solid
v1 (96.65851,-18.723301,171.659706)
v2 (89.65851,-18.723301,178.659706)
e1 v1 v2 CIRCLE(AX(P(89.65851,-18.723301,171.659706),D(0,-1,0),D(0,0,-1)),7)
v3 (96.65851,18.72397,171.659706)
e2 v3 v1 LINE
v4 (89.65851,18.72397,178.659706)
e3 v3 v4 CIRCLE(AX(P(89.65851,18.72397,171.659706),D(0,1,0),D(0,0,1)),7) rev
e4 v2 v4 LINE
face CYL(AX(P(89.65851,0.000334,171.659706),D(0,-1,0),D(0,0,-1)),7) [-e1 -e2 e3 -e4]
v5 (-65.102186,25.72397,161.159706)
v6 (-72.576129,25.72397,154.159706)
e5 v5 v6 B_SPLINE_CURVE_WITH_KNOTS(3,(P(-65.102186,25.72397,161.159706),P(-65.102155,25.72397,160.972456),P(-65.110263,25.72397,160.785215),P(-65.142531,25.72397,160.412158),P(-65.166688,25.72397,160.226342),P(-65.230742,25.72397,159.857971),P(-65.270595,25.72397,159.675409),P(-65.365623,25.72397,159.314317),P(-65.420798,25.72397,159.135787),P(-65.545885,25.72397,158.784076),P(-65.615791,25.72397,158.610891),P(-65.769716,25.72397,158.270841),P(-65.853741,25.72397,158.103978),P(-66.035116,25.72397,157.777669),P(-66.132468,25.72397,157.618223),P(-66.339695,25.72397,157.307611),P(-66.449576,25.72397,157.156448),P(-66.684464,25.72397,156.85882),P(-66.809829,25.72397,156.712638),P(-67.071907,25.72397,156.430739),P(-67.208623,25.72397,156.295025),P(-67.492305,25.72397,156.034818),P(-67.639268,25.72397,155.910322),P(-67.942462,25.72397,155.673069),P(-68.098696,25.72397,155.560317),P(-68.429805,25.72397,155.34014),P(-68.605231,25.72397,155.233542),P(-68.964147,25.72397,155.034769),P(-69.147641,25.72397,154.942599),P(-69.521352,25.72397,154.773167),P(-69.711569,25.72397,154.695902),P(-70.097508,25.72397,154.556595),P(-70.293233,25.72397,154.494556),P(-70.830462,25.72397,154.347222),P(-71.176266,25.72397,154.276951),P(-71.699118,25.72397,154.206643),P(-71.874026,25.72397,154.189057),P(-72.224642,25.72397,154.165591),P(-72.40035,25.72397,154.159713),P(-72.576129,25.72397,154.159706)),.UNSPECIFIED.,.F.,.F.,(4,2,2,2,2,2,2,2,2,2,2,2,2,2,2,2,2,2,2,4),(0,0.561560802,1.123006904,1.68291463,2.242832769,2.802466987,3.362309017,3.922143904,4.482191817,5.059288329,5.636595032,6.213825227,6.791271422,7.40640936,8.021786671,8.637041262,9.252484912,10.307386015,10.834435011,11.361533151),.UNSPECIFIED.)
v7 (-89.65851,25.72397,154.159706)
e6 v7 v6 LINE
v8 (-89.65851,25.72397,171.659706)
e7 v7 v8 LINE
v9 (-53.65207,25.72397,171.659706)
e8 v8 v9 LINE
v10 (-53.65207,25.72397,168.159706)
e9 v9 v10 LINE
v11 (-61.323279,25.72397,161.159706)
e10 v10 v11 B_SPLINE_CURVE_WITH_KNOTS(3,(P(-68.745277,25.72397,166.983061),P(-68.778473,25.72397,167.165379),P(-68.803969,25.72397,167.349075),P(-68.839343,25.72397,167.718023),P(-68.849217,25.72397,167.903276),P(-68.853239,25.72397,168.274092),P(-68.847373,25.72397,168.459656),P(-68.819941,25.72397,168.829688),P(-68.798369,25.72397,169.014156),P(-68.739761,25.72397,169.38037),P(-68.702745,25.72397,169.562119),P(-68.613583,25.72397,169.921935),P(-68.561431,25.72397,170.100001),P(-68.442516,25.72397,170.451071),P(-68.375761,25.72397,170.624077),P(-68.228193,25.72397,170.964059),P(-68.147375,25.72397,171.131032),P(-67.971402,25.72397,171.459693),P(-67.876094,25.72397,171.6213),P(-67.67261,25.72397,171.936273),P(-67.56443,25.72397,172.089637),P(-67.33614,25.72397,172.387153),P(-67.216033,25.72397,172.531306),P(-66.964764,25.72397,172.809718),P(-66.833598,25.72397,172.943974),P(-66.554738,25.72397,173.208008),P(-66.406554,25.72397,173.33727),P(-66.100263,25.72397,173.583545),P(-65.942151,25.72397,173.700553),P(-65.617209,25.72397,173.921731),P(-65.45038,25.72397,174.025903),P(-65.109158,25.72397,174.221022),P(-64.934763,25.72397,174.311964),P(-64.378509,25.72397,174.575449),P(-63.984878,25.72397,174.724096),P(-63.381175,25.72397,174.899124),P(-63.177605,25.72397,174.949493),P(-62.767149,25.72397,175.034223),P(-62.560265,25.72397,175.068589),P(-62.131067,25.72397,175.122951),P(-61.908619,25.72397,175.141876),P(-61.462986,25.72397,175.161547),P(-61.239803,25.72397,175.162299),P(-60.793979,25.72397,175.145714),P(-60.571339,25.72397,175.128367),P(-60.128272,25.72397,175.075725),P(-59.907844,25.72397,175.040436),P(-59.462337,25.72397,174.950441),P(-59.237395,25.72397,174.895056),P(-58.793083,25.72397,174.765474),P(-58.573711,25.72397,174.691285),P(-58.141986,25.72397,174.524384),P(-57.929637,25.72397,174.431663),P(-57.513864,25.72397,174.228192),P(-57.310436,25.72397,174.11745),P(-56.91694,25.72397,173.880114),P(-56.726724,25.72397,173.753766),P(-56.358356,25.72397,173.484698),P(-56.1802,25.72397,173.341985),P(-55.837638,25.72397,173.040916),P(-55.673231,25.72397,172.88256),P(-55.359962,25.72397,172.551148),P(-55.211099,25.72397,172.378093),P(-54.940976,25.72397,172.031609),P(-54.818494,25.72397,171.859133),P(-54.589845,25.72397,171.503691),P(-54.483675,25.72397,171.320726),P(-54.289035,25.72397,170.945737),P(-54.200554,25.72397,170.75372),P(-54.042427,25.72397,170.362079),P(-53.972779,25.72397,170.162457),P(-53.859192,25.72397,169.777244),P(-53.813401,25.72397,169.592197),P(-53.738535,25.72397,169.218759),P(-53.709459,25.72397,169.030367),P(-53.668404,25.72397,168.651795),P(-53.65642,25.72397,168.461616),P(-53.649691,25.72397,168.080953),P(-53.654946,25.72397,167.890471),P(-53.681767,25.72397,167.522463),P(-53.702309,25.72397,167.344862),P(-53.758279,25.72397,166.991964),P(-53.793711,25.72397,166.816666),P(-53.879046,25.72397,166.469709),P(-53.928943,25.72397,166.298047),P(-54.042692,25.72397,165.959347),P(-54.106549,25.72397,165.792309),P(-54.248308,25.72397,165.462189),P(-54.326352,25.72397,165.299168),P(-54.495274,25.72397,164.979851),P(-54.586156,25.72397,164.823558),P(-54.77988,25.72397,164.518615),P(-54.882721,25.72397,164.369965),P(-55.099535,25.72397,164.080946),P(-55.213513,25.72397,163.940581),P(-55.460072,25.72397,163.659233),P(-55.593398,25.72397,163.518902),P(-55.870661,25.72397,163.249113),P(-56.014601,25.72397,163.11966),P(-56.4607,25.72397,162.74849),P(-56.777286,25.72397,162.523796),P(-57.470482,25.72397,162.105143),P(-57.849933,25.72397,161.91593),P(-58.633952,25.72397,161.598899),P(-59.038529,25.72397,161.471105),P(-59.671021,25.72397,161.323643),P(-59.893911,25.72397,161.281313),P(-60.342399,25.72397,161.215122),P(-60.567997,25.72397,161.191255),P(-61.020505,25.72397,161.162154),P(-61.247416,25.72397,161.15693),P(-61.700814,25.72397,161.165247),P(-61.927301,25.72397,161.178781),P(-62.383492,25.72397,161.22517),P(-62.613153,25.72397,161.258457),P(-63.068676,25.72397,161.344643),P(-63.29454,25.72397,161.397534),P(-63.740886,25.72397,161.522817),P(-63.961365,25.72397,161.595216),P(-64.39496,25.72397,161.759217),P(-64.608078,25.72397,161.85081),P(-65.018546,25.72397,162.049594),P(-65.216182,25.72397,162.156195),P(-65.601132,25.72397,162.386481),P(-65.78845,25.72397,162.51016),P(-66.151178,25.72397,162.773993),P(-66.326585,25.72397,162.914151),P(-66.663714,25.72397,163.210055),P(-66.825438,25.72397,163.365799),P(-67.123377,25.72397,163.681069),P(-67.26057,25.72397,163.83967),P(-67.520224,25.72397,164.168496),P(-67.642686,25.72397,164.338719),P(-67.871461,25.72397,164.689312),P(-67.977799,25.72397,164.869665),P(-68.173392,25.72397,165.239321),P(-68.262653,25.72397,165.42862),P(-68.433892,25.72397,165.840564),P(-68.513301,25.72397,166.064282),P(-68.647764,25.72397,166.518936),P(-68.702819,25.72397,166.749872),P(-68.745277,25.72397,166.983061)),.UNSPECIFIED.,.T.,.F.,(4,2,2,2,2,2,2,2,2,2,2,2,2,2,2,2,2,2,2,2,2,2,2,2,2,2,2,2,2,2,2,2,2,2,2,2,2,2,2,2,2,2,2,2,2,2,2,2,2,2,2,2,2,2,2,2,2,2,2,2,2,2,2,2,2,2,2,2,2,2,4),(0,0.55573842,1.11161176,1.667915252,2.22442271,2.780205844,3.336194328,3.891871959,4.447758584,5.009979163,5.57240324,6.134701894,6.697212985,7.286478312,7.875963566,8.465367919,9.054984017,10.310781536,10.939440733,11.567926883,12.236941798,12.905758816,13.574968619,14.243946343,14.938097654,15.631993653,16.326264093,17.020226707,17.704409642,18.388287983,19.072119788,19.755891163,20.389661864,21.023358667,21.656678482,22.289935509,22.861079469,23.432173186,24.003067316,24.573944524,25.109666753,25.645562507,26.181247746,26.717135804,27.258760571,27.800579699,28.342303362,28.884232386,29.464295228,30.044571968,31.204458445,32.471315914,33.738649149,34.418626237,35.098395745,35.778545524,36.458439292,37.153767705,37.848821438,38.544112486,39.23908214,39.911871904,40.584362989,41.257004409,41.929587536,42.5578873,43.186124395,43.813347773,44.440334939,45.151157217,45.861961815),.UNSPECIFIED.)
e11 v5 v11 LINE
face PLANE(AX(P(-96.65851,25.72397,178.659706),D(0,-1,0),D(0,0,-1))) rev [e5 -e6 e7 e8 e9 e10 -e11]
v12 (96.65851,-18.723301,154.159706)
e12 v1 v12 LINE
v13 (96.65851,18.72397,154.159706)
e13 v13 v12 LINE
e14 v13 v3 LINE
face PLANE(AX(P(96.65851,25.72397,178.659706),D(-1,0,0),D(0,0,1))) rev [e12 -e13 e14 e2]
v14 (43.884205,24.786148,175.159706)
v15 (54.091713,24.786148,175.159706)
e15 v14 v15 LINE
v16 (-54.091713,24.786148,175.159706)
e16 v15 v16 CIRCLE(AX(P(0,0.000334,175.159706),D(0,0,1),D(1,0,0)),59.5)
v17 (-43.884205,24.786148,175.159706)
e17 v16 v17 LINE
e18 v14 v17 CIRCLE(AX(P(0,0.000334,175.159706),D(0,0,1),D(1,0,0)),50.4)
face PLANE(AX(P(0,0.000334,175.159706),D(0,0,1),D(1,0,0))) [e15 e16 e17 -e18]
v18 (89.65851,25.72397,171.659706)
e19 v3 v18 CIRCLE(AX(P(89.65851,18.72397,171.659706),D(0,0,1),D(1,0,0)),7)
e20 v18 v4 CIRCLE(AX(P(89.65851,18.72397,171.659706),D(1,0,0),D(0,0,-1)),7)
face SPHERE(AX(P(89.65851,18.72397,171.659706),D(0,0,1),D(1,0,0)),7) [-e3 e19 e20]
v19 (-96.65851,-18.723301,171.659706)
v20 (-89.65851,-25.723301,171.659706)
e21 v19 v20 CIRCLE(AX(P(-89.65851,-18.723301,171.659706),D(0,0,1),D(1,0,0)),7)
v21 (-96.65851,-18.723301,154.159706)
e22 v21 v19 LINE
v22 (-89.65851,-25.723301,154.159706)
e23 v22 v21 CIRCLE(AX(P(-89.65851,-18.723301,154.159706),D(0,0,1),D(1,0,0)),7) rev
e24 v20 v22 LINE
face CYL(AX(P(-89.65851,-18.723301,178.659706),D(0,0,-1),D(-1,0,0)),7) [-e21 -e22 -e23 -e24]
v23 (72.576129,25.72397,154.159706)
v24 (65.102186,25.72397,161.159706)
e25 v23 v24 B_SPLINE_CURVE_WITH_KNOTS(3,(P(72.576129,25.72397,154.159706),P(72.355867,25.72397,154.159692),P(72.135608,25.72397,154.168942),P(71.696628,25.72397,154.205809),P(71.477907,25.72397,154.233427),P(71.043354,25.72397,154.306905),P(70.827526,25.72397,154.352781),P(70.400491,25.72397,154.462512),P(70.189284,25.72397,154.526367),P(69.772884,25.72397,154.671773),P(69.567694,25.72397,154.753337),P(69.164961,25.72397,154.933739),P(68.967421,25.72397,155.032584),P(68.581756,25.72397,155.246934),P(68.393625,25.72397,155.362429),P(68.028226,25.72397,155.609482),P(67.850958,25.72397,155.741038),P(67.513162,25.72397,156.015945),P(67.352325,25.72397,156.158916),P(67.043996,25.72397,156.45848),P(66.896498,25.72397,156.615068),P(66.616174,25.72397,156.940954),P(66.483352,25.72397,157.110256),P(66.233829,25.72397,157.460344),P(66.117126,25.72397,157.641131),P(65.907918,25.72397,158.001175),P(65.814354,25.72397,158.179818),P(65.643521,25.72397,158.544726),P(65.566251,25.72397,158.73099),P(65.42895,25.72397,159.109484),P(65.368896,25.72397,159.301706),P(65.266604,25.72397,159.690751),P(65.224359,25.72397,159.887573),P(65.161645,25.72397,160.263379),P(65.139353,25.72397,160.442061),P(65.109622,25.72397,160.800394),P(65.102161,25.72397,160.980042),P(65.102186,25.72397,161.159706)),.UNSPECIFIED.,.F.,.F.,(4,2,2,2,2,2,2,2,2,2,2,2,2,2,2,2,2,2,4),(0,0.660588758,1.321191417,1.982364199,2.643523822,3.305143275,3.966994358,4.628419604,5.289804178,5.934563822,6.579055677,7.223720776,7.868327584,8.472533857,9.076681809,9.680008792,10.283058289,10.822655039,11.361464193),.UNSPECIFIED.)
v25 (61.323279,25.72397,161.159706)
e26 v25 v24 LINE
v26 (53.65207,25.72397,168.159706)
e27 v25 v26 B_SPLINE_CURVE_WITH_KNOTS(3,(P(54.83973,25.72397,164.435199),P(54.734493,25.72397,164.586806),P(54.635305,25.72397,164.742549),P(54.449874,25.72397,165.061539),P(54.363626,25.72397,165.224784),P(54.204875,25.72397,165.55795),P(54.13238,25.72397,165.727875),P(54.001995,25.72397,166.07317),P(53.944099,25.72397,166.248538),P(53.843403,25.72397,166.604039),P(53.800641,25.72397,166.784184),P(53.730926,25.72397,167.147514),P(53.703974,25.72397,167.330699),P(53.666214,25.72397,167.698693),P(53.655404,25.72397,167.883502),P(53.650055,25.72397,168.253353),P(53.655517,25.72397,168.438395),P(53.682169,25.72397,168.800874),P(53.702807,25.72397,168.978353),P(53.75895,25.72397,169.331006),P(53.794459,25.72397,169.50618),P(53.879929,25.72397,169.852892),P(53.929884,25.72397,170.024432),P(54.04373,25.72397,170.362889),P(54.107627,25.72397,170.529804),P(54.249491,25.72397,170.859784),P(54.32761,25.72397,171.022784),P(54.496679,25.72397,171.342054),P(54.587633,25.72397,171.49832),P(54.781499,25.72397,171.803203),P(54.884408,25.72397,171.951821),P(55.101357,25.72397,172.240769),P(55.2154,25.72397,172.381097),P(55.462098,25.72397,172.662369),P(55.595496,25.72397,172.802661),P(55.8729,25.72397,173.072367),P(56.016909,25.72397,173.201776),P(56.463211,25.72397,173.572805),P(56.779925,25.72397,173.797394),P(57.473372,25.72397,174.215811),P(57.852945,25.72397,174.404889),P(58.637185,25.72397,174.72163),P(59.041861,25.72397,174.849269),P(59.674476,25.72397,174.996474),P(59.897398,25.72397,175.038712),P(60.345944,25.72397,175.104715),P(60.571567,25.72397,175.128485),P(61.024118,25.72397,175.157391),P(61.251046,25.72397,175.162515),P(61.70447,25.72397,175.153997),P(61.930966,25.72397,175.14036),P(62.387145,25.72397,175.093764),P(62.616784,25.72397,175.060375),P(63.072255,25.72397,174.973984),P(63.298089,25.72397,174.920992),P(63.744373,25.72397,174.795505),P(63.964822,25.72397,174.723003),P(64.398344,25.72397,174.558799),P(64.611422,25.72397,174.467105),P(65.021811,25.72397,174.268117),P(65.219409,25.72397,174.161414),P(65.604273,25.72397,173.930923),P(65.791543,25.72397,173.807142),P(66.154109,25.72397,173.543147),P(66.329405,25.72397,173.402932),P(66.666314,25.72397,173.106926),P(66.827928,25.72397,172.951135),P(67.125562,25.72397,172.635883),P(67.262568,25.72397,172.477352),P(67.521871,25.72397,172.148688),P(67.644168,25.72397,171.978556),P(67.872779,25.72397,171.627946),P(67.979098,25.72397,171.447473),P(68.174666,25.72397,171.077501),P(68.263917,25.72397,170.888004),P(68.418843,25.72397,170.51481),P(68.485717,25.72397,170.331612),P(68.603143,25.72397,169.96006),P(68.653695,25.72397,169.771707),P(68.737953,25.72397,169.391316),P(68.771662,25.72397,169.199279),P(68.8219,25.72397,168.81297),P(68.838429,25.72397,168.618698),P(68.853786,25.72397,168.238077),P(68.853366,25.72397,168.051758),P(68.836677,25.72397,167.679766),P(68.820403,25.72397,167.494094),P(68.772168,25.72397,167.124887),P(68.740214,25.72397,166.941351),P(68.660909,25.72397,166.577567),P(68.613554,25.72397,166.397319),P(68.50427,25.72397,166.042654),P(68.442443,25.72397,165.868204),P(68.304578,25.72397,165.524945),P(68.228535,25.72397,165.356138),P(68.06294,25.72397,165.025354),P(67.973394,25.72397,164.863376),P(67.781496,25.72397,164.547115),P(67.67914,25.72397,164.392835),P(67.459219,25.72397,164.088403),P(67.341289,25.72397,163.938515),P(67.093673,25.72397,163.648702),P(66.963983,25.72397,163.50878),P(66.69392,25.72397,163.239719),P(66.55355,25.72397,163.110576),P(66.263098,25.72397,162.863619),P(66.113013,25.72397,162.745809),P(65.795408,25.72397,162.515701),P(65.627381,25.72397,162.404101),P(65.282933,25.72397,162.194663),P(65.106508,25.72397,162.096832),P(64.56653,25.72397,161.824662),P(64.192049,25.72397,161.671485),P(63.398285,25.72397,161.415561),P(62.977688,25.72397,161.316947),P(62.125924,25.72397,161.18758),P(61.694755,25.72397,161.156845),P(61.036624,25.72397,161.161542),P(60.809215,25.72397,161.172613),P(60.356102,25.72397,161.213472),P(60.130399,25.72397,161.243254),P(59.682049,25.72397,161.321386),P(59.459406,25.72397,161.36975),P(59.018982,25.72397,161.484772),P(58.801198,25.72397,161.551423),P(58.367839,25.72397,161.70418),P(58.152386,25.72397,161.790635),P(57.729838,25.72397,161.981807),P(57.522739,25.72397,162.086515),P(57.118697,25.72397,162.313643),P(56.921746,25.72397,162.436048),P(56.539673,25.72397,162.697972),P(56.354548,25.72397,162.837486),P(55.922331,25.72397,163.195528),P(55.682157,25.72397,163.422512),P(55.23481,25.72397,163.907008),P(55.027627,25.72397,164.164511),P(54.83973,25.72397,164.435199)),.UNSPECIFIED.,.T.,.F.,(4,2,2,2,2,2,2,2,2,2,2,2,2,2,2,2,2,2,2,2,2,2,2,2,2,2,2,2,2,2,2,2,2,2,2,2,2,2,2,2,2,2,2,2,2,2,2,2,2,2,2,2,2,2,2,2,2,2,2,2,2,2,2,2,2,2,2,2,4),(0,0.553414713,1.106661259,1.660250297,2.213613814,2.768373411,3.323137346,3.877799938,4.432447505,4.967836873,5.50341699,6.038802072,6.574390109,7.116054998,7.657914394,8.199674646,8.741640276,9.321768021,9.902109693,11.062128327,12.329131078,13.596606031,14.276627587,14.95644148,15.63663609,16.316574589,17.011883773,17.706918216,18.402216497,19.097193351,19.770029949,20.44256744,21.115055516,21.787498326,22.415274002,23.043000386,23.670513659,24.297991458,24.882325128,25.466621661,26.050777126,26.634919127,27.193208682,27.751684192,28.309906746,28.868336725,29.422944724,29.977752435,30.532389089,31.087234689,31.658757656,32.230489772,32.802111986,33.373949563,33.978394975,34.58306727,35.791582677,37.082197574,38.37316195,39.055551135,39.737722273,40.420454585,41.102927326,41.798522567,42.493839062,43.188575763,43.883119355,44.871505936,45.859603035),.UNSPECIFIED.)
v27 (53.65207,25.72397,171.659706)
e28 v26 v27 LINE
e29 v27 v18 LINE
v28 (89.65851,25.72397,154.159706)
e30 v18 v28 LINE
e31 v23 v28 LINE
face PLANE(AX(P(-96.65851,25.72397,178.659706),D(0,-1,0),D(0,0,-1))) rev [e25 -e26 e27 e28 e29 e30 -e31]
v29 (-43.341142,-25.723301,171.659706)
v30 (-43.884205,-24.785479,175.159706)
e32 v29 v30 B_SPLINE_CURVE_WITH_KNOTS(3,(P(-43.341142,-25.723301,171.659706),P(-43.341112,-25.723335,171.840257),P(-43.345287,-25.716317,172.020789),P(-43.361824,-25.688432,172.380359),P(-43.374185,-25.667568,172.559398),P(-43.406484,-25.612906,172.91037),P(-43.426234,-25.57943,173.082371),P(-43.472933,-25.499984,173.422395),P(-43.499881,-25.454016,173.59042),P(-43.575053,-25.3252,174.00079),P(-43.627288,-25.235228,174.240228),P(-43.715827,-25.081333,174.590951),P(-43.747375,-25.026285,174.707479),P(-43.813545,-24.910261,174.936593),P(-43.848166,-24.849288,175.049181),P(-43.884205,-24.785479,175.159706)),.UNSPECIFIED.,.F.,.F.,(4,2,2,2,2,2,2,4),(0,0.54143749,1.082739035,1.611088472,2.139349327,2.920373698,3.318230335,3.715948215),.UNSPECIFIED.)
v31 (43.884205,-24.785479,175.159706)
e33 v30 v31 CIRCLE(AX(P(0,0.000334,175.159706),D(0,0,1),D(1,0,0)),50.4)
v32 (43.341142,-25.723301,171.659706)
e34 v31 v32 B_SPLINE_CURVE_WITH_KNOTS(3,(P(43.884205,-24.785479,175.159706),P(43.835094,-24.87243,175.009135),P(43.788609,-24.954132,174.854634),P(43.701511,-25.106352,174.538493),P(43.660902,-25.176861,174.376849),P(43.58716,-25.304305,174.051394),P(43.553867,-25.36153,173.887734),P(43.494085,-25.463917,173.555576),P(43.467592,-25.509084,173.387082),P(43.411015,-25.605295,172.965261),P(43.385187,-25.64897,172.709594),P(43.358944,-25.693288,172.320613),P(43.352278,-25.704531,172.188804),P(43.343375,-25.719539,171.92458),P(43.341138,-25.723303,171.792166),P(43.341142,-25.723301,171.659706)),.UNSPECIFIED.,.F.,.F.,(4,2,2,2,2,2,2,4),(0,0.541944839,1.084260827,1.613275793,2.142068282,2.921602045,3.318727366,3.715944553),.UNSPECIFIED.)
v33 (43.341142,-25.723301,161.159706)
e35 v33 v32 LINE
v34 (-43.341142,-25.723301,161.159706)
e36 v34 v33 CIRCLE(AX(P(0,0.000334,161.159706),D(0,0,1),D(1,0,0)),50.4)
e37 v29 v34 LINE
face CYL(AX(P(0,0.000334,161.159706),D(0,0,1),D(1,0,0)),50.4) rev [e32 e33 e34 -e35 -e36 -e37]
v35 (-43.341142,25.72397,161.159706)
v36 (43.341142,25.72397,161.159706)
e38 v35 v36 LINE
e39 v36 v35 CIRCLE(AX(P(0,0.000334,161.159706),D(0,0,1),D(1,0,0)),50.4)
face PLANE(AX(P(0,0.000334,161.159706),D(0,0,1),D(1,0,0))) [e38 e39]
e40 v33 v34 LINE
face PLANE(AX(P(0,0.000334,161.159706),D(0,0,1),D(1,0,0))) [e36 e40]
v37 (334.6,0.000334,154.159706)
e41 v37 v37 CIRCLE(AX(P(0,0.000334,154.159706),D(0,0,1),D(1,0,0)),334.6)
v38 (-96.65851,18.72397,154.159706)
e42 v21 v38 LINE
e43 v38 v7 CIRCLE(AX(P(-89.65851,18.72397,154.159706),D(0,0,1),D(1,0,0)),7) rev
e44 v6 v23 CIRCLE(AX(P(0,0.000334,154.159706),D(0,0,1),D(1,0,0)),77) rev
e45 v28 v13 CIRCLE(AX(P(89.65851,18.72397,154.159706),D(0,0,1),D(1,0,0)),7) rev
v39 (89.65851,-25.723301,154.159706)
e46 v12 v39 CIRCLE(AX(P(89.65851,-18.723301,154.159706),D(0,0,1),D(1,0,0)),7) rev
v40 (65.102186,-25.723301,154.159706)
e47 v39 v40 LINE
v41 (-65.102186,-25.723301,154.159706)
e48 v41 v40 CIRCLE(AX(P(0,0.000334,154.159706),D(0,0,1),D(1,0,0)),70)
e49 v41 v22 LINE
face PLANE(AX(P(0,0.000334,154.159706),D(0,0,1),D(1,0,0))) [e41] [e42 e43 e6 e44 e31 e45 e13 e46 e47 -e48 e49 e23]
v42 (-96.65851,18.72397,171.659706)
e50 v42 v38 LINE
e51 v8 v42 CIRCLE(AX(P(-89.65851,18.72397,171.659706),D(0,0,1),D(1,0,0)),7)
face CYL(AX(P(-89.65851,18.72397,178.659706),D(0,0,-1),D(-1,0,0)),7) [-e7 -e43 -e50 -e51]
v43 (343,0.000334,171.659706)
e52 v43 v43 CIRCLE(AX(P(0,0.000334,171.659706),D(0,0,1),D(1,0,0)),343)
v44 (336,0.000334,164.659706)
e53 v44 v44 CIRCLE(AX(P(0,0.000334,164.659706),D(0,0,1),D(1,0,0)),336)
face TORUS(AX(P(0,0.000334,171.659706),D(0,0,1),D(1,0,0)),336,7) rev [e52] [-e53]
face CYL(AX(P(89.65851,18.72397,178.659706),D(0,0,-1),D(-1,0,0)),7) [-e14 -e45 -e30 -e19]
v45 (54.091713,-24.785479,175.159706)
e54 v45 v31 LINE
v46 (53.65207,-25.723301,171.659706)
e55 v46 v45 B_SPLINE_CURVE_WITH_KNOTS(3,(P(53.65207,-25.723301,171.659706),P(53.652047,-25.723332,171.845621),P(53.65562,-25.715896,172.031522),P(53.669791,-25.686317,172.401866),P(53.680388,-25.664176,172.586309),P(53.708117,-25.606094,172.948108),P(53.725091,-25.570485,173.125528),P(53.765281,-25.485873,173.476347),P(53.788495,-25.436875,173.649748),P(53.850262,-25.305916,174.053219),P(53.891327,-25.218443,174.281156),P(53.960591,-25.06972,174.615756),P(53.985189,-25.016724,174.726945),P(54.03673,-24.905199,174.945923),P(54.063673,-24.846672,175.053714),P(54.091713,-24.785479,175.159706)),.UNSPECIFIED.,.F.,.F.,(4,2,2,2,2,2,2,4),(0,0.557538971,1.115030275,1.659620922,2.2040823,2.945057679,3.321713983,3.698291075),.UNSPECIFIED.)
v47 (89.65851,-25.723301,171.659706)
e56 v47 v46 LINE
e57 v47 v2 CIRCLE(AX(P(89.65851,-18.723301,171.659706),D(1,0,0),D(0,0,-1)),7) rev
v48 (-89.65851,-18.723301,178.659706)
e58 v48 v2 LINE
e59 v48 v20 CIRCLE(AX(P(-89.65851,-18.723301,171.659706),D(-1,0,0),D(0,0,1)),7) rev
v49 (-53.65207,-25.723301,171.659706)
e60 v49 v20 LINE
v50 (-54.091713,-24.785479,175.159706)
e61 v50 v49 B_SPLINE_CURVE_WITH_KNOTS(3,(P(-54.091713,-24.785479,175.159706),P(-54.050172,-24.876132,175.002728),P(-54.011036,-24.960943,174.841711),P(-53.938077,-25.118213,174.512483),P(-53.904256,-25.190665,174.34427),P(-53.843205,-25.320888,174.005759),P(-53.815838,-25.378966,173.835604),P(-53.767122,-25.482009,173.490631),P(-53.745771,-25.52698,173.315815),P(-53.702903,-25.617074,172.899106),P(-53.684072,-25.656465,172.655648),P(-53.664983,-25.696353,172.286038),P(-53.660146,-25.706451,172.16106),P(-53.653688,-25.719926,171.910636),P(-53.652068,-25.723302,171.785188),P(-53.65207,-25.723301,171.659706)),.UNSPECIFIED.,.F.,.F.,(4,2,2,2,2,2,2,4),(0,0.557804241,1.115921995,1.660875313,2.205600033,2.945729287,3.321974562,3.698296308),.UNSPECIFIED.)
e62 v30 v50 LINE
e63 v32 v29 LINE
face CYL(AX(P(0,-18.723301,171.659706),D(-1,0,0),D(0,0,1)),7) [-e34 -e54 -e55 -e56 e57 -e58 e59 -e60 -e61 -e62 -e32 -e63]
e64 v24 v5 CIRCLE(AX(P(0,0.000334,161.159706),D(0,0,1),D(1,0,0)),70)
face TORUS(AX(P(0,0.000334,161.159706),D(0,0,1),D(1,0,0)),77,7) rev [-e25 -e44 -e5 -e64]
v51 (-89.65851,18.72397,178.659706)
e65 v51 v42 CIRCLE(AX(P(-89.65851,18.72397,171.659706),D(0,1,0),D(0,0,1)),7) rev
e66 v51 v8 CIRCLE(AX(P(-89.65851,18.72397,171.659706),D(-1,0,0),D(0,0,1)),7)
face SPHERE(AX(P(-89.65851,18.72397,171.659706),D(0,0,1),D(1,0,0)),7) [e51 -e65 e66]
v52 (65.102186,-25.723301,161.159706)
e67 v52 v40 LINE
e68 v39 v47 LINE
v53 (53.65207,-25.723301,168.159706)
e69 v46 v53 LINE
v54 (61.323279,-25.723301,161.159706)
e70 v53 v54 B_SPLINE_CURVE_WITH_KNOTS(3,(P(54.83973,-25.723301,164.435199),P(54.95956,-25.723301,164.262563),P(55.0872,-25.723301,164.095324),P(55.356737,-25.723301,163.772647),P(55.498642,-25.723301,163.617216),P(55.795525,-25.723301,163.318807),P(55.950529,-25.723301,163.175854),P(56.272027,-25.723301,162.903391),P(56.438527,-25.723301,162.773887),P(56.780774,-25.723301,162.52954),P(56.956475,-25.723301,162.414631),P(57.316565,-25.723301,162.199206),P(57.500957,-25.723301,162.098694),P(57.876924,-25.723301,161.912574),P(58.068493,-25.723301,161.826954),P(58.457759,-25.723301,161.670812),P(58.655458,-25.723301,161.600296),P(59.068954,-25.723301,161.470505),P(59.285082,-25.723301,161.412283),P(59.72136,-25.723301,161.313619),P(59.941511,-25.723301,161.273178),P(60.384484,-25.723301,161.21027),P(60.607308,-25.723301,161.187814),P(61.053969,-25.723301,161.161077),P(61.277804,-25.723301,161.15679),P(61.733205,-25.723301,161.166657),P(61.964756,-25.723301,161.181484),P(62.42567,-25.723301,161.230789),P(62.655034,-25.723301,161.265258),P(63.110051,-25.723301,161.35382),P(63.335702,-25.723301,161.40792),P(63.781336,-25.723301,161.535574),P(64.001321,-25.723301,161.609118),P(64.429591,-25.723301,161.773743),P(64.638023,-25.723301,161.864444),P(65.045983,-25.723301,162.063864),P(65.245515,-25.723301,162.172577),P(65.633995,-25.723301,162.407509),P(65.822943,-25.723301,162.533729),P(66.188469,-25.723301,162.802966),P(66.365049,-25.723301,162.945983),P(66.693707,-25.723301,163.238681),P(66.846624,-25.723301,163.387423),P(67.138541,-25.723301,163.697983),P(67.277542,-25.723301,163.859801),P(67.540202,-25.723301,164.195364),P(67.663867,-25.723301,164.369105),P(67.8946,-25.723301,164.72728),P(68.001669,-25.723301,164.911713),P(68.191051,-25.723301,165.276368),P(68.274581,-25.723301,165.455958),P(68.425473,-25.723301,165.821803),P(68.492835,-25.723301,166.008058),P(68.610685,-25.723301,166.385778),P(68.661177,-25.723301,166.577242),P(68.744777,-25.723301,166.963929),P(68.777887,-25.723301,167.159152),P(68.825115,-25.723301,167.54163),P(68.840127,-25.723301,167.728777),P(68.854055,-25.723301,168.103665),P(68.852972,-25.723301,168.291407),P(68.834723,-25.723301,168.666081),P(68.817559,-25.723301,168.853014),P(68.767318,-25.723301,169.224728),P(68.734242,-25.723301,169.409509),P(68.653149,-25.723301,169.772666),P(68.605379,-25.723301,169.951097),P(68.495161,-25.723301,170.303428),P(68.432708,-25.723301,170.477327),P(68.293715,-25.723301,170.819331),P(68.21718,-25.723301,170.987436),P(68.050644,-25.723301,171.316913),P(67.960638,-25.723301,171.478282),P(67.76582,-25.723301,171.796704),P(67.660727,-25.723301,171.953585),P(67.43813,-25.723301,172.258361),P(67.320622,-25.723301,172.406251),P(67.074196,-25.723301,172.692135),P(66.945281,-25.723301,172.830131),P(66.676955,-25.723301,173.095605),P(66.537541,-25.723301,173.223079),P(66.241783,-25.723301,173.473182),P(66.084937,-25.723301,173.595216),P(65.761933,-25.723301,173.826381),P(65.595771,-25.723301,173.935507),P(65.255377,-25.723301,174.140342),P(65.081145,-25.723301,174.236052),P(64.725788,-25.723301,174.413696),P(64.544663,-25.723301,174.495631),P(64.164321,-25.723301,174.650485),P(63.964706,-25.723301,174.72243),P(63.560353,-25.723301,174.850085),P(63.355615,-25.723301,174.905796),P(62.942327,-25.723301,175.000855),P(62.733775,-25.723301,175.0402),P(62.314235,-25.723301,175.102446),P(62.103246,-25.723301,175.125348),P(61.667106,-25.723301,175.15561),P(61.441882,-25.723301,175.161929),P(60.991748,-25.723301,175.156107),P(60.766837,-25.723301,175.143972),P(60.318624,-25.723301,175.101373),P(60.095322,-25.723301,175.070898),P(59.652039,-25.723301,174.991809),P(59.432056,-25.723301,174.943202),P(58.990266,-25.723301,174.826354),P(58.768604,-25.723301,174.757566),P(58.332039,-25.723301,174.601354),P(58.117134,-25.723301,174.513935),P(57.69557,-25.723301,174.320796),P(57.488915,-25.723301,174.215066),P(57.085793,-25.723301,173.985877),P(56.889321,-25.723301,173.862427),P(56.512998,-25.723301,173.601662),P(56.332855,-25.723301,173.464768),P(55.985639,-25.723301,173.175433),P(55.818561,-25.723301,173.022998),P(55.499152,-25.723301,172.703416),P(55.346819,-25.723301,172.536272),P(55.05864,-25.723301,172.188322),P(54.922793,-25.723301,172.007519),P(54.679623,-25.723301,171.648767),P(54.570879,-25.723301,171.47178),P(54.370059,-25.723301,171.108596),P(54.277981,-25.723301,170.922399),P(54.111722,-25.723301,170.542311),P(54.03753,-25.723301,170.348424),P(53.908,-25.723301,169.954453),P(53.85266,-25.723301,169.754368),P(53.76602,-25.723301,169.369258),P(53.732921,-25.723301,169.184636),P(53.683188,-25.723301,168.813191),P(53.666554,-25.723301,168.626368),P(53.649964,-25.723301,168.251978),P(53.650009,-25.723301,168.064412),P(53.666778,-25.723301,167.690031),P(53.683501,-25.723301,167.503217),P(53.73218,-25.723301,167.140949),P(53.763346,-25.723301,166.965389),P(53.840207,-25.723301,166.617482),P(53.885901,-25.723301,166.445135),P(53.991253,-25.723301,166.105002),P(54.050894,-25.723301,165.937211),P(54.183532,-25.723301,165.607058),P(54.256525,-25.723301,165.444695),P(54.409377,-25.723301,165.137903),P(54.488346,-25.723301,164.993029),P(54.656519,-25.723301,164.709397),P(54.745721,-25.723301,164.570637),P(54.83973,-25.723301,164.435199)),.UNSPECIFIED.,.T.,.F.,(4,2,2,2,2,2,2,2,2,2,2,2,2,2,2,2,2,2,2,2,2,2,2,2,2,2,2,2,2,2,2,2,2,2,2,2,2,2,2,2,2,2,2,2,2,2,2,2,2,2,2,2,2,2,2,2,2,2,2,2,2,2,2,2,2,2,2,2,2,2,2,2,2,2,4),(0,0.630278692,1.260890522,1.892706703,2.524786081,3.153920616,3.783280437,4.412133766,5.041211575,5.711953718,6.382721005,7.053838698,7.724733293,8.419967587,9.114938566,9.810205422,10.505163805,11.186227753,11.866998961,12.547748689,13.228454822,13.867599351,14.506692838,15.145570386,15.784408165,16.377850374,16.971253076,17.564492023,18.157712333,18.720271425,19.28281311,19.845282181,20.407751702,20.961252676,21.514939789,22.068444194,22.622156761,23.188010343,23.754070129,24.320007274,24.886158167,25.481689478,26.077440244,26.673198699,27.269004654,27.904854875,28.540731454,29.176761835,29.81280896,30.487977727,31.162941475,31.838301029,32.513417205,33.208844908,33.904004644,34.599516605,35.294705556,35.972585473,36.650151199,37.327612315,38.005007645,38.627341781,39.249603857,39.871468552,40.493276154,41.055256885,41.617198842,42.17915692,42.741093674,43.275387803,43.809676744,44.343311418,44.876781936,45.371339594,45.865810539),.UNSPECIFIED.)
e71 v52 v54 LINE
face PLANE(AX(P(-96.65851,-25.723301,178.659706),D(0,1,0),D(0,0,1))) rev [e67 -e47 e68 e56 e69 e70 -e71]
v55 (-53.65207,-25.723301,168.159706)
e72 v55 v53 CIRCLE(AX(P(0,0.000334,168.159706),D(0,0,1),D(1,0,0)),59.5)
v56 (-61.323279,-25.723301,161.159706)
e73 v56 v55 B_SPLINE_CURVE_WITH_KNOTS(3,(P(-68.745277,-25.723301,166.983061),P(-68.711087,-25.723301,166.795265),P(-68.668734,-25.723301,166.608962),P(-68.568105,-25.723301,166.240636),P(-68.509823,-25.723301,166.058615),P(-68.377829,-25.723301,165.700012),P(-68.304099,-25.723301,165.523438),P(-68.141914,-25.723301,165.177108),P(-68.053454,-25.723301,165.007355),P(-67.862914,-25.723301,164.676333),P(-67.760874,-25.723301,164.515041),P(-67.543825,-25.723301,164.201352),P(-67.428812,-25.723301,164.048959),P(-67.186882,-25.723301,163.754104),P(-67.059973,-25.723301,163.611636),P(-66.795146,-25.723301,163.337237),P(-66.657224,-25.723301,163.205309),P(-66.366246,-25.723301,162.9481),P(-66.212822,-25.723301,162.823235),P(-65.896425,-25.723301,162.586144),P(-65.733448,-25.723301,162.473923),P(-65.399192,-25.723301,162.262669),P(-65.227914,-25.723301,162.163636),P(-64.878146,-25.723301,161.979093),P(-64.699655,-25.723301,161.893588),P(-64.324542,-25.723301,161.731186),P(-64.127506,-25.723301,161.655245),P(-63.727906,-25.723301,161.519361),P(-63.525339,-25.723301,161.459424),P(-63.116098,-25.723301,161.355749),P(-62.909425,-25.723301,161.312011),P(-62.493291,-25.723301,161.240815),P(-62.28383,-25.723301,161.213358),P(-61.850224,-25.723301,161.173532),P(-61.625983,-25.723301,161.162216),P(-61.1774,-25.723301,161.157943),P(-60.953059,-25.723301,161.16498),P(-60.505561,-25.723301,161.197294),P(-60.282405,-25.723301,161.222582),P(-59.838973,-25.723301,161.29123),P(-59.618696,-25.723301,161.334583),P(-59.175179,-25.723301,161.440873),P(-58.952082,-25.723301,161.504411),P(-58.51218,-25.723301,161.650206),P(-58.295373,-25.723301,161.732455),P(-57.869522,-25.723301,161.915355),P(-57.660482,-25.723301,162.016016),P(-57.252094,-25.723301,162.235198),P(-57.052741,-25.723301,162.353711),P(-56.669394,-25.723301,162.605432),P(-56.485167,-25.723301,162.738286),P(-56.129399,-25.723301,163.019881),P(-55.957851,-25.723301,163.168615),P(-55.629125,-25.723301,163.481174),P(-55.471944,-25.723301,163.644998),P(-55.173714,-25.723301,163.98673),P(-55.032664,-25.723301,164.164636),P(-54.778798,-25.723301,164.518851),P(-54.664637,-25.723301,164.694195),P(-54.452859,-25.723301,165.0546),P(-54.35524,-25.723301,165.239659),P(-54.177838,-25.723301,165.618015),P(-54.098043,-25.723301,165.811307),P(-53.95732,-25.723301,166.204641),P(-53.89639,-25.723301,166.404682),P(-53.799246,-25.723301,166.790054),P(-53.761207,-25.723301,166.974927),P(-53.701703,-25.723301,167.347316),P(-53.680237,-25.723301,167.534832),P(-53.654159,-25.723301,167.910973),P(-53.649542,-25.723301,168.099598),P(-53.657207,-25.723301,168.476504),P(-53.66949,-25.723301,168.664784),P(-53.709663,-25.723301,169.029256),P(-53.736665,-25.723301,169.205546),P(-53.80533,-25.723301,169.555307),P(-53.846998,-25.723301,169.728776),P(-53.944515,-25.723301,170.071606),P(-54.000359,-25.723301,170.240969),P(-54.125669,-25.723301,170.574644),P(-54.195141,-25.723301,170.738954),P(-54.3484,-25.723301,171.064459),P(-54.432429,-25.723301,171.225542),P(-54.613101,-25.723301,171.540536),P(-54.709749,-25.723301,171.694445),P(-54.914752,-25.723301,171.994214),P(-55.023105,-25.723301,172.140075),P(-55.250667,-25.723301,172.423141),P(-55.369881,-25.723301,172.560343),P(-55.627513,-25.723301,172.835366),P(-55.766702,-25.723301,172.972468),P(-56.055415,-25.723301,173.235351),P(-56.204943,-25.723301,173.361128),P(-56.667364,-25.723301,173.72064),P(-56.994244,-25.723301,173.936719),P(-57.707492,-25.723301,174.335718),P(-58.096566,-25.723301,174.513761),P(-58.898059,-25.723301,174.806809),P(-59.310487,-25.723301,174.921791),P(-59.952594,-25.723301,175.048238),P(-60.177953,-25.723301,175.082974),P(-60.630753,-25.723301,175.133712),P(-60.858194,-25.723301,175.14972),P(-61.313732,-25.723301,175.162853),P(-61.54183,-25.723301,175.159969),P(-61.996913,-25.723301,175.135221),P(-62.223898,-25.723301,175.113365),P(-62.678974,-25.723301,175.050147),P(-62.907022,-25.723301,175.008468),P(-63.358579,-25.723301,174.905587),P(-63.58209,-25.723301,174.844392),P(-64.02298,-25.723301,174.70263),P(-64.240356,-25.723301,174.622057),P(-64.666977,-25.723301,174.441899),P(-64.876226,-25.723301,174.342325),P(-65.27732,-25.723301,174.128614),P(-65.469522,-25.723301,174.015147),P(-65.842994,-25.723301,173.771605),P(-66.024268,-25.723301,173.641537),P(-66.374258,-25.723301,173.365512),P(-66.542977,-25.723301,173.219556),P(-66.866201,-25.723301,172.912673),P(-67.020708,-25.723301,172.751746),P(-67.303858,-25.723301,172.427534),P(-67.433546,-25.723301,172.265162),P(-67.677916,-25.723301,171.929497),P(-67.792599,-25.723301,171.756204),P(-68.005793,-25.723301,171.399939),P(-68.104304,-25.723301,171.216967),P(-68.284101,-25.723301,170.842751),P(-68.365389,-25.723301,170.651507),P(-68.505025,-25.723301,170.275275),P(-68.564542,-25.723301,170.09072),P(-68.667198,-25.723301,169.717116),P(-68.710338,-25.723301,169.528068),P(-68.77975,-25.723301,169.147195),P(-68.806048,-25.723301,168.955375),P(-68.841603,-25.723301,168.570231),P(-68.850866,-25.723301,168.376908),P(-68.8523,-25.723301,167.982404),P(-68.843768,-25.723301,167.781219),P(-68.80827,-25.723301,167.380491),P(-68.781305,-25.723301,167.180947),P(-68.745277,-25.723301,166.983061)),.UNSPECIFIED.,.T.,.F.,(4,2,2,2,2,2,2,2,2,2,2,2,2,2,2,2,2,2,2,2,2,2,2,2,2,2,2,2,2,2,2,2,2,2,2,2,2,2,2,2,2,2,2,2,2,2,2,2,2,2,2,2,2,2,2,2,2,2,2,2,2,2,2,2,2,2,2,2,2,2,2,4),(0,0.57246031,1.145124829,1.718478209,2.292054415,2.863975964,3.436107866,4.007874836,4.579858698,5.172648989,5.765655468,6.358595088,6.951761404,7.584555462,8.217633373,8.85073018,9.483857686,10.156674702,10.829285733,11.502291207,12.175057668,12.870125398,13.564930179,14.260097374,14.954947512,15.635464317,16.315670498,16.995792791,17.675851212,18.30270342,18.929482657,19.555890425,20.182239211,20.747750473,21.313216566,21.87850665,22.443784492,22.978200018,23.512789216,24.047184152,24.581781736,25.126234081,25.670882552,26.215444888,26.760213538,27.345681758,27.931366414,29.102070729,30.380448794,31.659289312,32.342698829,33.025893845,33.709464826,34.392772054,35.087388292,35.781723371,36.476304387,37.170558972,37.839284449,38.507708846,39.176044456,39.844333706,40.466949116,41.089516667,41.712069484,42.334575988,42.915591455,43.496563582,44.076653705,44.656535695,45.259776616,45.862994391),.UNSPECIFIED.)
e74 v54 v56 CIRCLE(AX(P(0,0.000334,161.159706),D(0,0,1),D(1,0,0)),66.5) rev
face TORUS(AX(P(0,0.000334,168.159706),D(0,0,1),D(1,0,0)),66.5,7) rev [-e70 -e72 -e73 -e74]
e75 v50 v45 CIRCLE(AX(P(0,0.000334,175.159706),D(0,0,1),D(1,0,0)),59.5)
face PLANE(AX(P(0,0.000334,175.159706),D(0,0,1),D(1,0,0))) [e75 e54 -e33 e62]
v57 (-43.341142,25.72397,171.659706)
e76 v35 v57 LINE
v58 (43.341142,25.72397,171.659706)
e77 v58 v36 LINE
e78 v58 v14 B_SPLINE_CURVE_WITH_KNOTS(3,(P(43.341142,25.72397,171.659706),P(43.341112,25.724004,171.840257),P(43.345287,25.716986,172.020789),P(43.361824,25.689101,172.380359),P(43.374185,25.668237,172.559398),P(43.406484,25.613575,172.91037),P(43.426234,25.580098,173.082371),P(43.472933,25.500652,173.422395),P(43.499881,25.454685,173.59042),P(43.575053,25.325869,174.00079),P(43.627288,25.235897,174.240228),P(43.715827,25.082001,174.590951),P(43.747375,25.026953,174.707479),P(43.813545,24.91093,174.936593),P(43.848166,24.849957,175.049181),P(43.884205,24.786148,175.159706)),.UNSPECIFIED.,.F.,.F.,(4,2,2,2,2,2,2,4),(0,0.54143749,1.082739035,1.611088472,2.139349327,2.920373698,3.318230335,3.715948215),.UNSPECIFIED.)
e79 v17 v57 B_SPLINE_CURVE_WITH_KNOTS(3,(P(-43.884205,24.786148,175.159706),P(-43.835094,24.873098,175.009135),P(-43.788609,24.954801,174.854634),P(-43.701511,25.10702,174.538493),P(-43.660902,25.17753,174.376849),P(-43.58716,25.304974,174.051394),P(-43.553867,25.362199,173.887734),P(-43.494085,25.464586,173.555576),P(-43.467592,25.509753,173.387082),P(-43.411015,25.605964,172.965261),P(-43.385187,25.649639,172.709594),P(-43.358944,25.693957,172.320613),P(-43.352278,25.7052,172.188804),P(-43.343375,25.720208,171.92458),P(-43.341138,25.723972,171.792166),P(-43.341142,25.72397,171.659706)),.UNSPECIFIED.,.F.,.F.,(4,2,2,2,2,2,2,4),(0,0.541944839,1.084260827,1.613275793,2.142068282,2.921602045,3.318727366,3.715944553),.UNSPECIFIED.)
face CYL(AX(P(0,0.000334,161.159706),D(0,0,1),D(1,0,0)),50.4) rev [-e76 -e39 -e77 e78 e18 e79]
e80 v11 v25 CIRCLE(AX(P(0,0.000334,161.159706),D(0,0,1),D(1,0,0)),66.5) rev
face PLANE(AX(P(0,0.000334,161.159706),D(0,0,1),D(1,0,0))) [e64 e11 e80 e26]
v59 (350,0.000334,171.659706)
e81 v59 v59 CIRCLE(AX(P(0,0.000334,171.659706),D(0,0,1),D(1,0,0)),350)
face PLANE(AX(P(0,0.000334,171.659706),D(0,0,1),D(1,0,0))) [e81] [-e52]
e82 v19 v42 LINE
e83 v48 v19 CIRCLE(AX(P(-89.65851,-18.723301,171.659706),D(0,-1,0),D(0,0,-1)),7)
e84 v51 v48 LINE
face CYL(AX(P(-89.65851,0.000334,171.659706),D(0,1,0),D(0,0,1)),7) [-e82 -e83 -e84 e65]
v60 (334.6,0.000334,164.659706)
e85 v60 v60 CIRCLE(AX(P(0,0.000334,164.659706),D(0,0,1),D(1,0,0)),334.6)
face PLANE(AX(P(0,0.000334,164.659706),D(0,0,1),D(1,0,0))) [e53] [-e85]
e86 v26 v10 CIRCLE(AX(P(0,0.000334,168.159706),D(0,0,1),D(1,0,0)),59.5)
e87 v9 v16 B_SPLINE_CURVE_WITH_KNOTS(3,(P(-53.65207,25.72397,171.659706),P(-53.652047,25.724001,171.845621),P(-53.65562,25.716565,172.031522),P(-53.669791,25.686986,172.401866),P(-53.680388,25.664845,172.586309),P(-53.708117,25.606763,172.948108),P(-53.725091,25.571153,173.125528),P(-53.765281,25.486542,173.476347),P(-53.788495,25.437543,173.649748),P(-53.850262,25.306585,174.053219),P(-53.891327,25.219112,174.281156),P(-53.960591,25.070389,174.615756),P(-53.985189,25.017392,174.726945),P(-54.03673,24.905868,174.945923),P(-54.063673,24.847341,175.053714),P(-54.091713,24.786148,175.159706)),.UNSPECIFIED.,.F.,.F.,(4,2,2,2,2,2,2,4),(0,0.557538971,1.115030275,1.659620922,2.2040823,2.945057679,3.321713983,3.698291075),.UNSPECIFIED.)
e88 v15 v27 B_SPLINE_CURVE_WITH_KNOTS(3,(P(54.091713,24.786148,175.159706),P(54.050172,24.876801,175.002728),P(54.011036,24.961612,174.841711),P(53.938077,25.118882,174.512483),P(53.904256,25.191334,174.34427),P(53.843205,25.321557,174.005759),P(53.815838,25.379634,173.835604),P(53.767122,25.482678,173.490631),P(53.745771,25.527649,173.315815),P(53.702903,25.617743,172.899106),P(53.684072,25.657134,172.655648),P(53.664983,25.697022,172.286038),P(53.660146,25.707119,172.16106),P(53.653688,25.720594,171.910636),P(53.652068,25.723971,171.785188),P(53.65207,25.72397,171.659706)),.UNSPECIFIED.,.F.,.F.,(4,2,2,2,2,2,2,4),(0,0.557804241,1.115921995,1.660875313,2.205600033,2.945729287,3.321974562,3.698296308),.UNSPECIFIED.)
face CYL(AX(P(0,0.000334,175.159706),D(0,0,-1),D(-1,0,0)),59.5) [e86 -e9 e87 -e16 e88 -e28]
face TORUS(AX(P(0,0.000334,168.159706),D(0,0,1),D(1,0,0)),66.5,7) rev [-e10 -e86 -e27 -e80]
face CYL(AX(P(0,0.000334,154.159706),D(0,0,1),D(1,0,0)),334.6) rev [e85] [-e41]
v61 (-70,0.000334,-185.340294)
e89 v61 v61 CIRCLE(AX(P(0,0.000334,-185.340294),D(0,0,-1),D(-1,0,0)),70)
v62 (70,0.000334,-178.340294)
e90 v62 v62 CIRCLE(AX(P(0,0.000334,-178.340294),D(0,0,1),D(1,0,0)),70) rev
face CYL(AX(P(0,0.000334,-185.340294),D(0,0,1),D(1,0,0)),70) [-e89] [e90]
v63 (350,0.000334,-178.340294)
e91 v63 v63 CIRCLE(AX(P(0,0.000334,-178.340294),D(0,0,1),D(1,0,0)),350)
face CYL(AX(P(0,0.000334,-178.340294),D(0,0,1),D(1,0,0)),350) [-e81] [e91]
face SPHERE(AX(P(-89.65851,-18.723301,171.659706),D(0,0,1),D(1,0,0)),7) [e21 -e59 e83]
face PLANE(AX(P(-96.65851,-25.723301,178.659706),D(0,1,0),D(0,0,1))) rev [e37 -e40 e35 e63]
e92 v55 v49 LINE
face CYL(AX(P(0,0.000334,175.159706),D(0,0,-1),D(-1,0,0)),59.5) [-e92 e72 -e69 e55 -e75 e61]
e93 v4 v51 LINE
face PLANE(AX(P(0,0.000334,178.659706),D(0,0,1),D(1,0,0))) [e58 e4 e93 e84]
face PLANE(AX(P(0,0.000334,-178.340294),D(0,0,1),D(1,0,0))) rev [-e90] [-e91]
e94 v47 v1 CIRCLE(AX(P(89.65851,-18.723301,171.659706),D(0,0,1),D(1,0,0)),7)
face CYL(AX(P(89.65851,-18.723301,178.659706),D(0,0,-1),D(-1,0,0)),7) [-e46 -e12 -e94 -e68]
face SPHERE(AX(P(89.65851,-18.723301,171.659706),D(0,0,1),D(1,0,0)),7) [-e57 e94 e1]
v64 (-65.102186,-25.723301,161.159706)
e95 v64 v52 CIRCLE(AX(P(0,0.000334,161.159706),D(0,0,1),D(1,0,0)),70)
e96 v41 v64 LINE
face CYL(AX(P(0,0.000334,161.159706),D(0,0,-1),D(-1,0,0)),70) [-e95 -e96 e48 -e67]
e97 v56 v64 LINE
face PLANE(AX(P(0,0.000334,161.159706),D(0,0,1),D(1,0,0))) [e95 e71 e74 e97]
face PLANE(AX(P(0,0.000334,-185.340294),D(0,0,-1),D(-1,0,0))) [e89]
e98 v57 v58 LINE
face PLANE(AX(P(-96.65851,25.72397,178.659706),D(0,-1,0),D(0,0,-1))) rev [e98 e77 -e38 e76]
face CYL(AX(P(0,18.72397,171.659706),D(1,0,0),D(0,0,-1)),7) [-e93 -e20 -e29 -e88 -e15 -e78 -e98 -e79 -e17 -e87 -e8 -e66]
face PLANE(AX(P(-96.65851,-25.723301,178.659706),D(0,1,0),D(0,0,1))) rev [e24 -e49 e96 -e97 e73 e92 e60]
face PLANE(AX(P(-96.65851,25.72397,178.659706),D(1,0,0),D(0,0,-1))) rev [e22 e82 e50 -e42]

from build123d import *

# Parameters (mm, degrees)
BOSS_EXTRUDE1_DEPTH      = 250
BOSS_EXTRUDE1_DEPTH_BACK = 250
SKETCH2_R                = 500
SKETCH3_R                = 490
CUT_EXTRUDE4_DEPTH       = 10
SKETCH5_R                = 478
CUT_EXTRUDE5_DEPTH       = 15
SKETCH6_R                = 100
BOSS_EXTRUDE2_DEPTH      = 10
SKETCH7_R                = 85
BOSS_EXTRUDE3_DEPTH      = 20
SKETCH8_R                = 72
CUT_EXTRUDE6_DEPTH       = 20
FILLET2_R                = 10
SKETCH9_W                = 276.167171278
SKETCH9_H                = 73.496102034
BOSS_EXTRUDE4_DEPTH      = 40
FILLET3_R                = 10
FILLET4_R                = 10
FILLET5_R                = 10
BOSS_EXTRUDE5_START      = 10
SKETCH10_R               = 100
BOSS_EXTRUDE5_DEPTH      = 10
SCALE1_SCALE             = 0.7


# Some blends are built 0.0001 mm under size
with BuildPart() as part:
    # Sketch2 → Boss-Extrude1 (new, two sides: drawn at the far end of the back side and taken through both)
    with BuildSketch(Plane.XY.offset(-BOSS_EXTRUDE1_DEPTH_BACK)):
        Circle(SKETCH2_R)
    extrude(amount=BOSS_EXTRUDE1_DEPTH + BOSS_EXTRUDE1_DEPTH_BACK)

    # Sketch3 → Cut-Extrude4 (cut)
    with BuildSketch(Plane.XY.offset(250)):
        Circle(SKETCH3_R)
    extrude(amount=-CUT_EXTRUDE4_DEPTH, mode=Mode.SUBTRACT)

    # Sketch5 → Cut-Extrude5 (cut)
    with BuildSketch(Plane.XY.offset(240)):
        Circle(SKETCH5_R)
    extrude(amount=-CUT_EXTRUDE5_DEPTH, mode=Mode.SUBTRACT)

    # Sketch6 → Boss-Extrude2 (add)
    with BuildSketch(Plane.XY.offset(225)):
        Circle(SKETCH6_R)
    extrude(amount=BOSS_EXTRUDE2_DEPTH)

    # Sketch7 → Boss-Extrude3 (add)
    with BuildSketch(Plane.XY.offset(235)):
        Circle(SKETCH7_R)
    extrude(amount=BOSS_EXTRUDE3_DEPTH)

    # Sketch8 → Cut-Extrude6 (cut)
    with BuildSketch(Plane.XY.offset(255)):
        Circle(SKETCH8_R)
    extrude(amount=-CUT_EXTRUDE6_DEPTH, mode=Mode.SUBTRACT)

    # Fillet2
    fillet2_edges = [part.edges().sort_by_distance(p)[0] for p in [
        (-85, 0, 235),
    ]]
    fillet(fillet2_edges, radius=FILLET2_R)

    # Sketch9 → Boss-Extrude4 (add)
    with BuildSketch(Plane.XY.offset(220)):
        Rectangle(SKETCH9_W, SKETCH9_H)
    extrude(amount=BOSS_EXTRUDE4_DEPTH)

    # Fillet3
    # the kernel refuses this fillet: 10 mm, written as the material it takes off along each edge
    with BuildSketch(Plane(origin=(128.083585639, -26.748051017, 250), x_dir=(0, 0, 1), z_dir=(1, 0, 0))) as fillet3_piece_1_section:
        Polygon((0, 0), (FILLET3_R * 1.02, 0), (FILLET3_R * 1.02, FILLET3_R * 1.02), (0, FILLET3_R * 1.02), align=None)
    fillet3_piece_1 = extrude(amount=FILLET3_R * 1.02, mode=Mode.PRIVATE)
    fillet3_piece_1 = fillet3_piece_1 - Plane(origin=(128.083585639, -26.748051017, 250), x_dir=(0, 0.7071067811865475, -0.7071067811865475), z_dir=(1, 0, 0)) * Sphere(FILLET3_R, mode=Mode.PRIVATE)
    add(fillet3_piece_1, mode=Mode.SUBTRACT)
    with BuildSketch(Plane(origin=(-128.083585639, -26.748051017, 250), x_dir=(-1, 0, 0), z_dir=(0, 0, 1))) as fillet3_piece_2_section:
        Polygon((0, 0), (FILLET3_R * 1.02, 0), (FILLET3_R * 1.02, FILLET3_R * 1.02), (0, FILLET3_R * 1.02), align=None)
    fillet3_piece_2 = extrude(amount=FILLET3_R * 1.02, mode=Mode.PRIVATE)
    fillet3_piece_2 = fillet3_piece_2 - Plane(origin=(-128.083585639, -26.748051017, 250), x_dir=(0.7071067811865475, 0.7071067811865475, 0), z_dir=(0, 0, 1)) * Sphere(FILLET3_R, mode=Mode.PRIVATE)
    add(fillet3_piece_2, mode=Mode.SUBTRACT)
    with BuildSketch(Plane(origin=(-128.083585639, 26.748051017, 250), x_dir=(0, 0, 1), z_dir=(0, 1, 0))) as fillet3_piece_3_section:
        Polygon((0, 0), (FILLET3_R * 1.02, 0), (FILLET3_R * 1.02, -FILLET3_R * 1.02), (0, -FILLET3_R * 1.02), align=None)
    fillet3_piece_3 = extrude(amount=FILLET3_R * 1.02, mode=Mode.PRIVATE)
    fillet3_piece_3 = fillet3_piece_3 - Plane(origin=(-128.083585639, 26.748051017, 250), x_dir=(0.7071067811865475, 0, -0.7071067811865475), z_dir=(0, 1, 0)) * Sphere(FILLET3_R, mode=Mode.PRIVATE)
    add(fillet3_piece_3, mode=Mode.SUBTRACT)
    with BuildSketch(Plane(origin=(128.083585639, 26.748051017, 250), x_dir=(0, 1, 0), z_dir=(1, 0, 0))) as fillet3_piece_4_section:
        Polygon((0, 0), (FILLET3_R * 1.02, 0), (FILLET3_R * 1.02, FILLET3_R * 1.02), (0, FILLET3_R * 1.02), align=None)
    fillet3_piece_4 = extrude(amount=FILLET3_R * 1.02, mode=Mode.PRIVATE)
    fillet3_piece_4 = fillet3_piece_4 - Plane(origin=(128.083585639, 26.748051017, 250), x_dir=(0, -0.7071067811865475, -0.7071067811865475), z_dir=(1, 0, 0)) * Sphere(FILLET3_R, mode=Mode.PRIVATE)
    add(fillet3_piece_4, mode=Mode.SUBTRACT)
    with BuildSketch(Plane(origin=(128.083585639, -36.748051017, 260), x_dir=(0, 1, 0), z_dir=(-1, 0, 0))) as fillet3_piece_5_section:
        with BuildLine():
            CenterArc((FILLET3_R, FILLET3_R), FILLET3_R, 180, 90)
            Line((0, FILLET3_R), (0, 0))
            Line((0, 0), (FILLET3_R, 0))
        make_face()
    fillet3_piece_5 = extrude(amount=256.167171277, mode=Mode.PRIVATE)
    fillet3_piece_5 = split(fillet3_piece_5, bisect_by=Plane(origin=(102.906545957, -34.337396915, 255), z_dir=(0, 0, 1)), keep=Keep.TOP, mode=Mode.PRIVATE)
    add(fillet3_piece_5, mode=Mode.SUBTRACT)
    with BuildSketch(Plane(origin=(128.083585639, -36.748051017, 260), x_dir=(0, 1, 0), z_dir=(-1, 0, 0))) as fillet3_piece_6_section:
        with BuildLine():
            CenterArc((FILLET3_R, FILLET3_R), FILLET3_R, 180, 90)
            Line((0, FILLET3_R), (0, 0))
            Line((0, 0), (FILLET3_R, 0))
        make_face()
    fillet3_piece_6 = extrude(amount=256.167171277, mode=Mode.PRIVATE)
    fillet3_piece_6 = fillet3_piece_6 - Plane(origin=(0, 0, 253.76582848), x_dir=(1, 0, 0), z_dir=(0, 0, -1)) * Cylinder(85, 553, mode=Mode.PRIVATE)
    add(fillet3_piece_6, mode=Mode.SUBTRACT)
    with BuildSketch(Plane(origin=(128.083585639, -36.748051017, 260), x_dir=(0, 1, 0), z_dir=(-1, 0, 0))) as fillet3_piece_7_section:
        with BuildLine():
            CenterArc((FILLET3_R, FILLET3_R), FILLET3_R, 180, 90)
            Line((0, FILLET3_R), (0, 0))
            Line((0, 0), (FILLET3_R, 0))
        make_face()
    fillet3_piece_7 = extrude(amount=256.167171277, mode=Mode.PRIVATE)
    fillet3_piece_7 = fillet3_piece_7 & Plane(origin=(0, 0, 253.76892881), x_dir=(1, 0, 0), z_dir=(0, 0, 1)) * Cylinder(72, 553, mode=Mode.PRIVATE)
    add(fillet3_piece_7, mode=Mode.SUBTRACT)
    with BuildSketch(Plane(origin=(-138.083585639, -26.748051017, 260), x_dir=(1, 0, 0), z_dir=(0, 1, 0))) as fillet3_piece_8:
        with BuildLine():
            CenterArc((FILLET3_R, FILLET3_R), FILLET3_R, 180, 90)
            Line((0, FILLET3_R), (0, 0))
            Line((0, 0), (FILLET3_R, 0))
        make_face()
    extrude(amount=53.496102033, mode=Mode.SUBTRACT)
    with BuildSketch(Plane(origin=(-128.083585639, 36.748051017, 260), x_dir=(0, 0, -1), z_dir=(1, 0, 0))) as fillet3_piece_9_section:
        with BuildLine():
            CenterArc((FILLET3_R, -FILLET3_R), FILLET3_R, 90, 90)
            Line((0, -FILLET3_R), (0, 0))
            Line((0, 0), (FILLET3_R, 0))
        make_face()
    fillet3_piece_9 = extrude(amount=256.167171277, mode=Mode.PRIVATE)
    fillet3_piece_9 = fillet3_piece_9 - Plane(origin=(0, 0, 253.76582848), x_dir=(1, 0, 0), z_dir=(0, 0, -1)) * Cylinder(85, 553, mode=Mode.PRIVATE)
    add(fillet3_piece_9, mode=Mode.SUBTRACT)
    with BuildSketch(Plane(origin=(-128.083585639, 36.748051017, 260), x_dir=(0, 0, -1), z_dir=(1, 0, 0))) as fillet3_piece_10_section:
        with BuildLine():
            CenterArc((FILLET3_R, -FILLET3_R), FILLET3_R, 90, 90)
            Line((0, -FILLET3_R), (0, 0))
            Line((0, 0), (FILLET3_R, 0))
        make_face()
    fillet3_piece_10 = extrude(amount=256.167171277, mode=Mode.PRIVATE)
    fillet3_piece_10 = split(fillet3_piece_10, bisect_by=Plane(origin=(-70.492794496, 34.331084629, 255), z_dir=(0, 0, 1)), keep=Keep.TOP, mode=Mode.PRIVATE)
    add(fillet3_piece_10, mode=Mode.SUBTRACT)
    with BuildSketch(Plane(origin=(-128.083585639, 36.748051017, 260), x_dir=(0, 0, -1), z_dir=(1, 0, 0))) as fillet3_piece_11_section:
        with BuildLine():
            CenterArc((FILLET3_R, -FILLET3_R), FILLET3_R, 90, 90)
            Line((0, -FILLET3_R), (0, 0))
            Line((0, 0), (FILLET3_R, 0))
        make_face()
    fillet3_piece_11 = extrude(amount=256.167171277, mode=Mode.PRIVATE)
    fillet3_piece_11 = fillet3_piece_11 & Plane(origin=(0, 0, 253.768928808), x_dir=(1, 0, 0), z_dir=(0, 0, 1)) * Cylinder(72, 553, mode=Mode.PRIVATE)
    add(fillet3_piece_11, mode=Mode.SUBTRACT)
    with BuildSketch(Plane(origin=(138.083585639, 26.748051017, 260), x_dir=(0, 0, -1), z_dir=(0, -1, 0))) as fillet3_piece_12:
        with BuildLine():
            CenterArc((FILLET3_R, -FILLET3_R), FILLET3_R, 90, 90)
            Line((0, -FILLET3_R), (0, 0))
            Line((0, 0), (FILLET3_R, 0))
        make_face()
    extrude(amount=53.496102033, mode=Mode.SUBTRACT)
    with BuildSketch(Plane(origin=(138.083585639, 36.748051017, 225), x_dir=(-1, 0, 0), z_dir=(0, 0, 1)), Plane(origin=(138.083585639, -36.748051017, 225), x_dir=(0, 1, 0), z_dir=(0, 0, 1))) as fillet3_piece_13:
        with BuildLine():
            CenterArc((FILLET3_R, FILLET3_R), FILLET3_R, 180, 90)
            Line((0, FILLET3_R), (0, 0))
            Line((0, 0), (FILLET3_R, 0))
        make_face()
    extrude(amount=25, mode=Mode.SUBTRACT)
    with BuildSketch(Plane(origin=(-138.083585639, -36.748051017, 225), x_dir=(0, 1, 0), z_dir=(0, 0, 1)), Plane(origin=(-138.083585639, 36.748051017, 225), x_dir=(1, 0, 0), z_dir=(0, 0, 1))) as fillet3_piece_14:
        with BuildLine():
            CenterArc((FILLET3_R, -FILLET3_R), FILLET3_R, 90, 90)
            Line((0, -FILLET3_R), (0, 0))
            Line((0, 0), (FILLET3_R, 0))
        make_face()
    extrude(amount=25, mode=Mode.SUBTRACT)

    # Fillet4
    fillet4_edges = [part.edges().sort_by_distance(p)[0] for p in [
        (0, 100, 225),
    ]]
    fillet(fillet4_edges, radius=FILLET4_R - 0.0001)  # a hair under: the kernel refuses the full size

    # Fillet5
    fillet5_edges = [part.edges().sort_by_distance(p)[0] for p in [
        (-490, 0, 240),
    ]]
    fillet(fillet5_edges, radius=FILLET5_R - 0.0001)  # a hair under: the kernel refuses the full size

    # Sketch10 → Boss-Extrude5 (add)
    with BuildSketch(Plane(origin=(0, 0, -250), x_dir=(-1, 0, 0), z_dir=(0, 0, -1)).offset(BOSS_EXTRUDE5_START)):
        with Locations(Location((0, 0, 0), (0, 0, 180))):
            Circle(SKETCH10_R)
    extrude(amount=-BOSS_EXTRUDE5_DEPTH)


with BuildPart() as part_1:
    # Scale1: scaled about (0, 0.001114487, -11.134314022)
    add(part.part.scale(SCALE1_SCALE).moved(Location((0, 0.000334346, -3.340294207))))


solid = part_1.part
